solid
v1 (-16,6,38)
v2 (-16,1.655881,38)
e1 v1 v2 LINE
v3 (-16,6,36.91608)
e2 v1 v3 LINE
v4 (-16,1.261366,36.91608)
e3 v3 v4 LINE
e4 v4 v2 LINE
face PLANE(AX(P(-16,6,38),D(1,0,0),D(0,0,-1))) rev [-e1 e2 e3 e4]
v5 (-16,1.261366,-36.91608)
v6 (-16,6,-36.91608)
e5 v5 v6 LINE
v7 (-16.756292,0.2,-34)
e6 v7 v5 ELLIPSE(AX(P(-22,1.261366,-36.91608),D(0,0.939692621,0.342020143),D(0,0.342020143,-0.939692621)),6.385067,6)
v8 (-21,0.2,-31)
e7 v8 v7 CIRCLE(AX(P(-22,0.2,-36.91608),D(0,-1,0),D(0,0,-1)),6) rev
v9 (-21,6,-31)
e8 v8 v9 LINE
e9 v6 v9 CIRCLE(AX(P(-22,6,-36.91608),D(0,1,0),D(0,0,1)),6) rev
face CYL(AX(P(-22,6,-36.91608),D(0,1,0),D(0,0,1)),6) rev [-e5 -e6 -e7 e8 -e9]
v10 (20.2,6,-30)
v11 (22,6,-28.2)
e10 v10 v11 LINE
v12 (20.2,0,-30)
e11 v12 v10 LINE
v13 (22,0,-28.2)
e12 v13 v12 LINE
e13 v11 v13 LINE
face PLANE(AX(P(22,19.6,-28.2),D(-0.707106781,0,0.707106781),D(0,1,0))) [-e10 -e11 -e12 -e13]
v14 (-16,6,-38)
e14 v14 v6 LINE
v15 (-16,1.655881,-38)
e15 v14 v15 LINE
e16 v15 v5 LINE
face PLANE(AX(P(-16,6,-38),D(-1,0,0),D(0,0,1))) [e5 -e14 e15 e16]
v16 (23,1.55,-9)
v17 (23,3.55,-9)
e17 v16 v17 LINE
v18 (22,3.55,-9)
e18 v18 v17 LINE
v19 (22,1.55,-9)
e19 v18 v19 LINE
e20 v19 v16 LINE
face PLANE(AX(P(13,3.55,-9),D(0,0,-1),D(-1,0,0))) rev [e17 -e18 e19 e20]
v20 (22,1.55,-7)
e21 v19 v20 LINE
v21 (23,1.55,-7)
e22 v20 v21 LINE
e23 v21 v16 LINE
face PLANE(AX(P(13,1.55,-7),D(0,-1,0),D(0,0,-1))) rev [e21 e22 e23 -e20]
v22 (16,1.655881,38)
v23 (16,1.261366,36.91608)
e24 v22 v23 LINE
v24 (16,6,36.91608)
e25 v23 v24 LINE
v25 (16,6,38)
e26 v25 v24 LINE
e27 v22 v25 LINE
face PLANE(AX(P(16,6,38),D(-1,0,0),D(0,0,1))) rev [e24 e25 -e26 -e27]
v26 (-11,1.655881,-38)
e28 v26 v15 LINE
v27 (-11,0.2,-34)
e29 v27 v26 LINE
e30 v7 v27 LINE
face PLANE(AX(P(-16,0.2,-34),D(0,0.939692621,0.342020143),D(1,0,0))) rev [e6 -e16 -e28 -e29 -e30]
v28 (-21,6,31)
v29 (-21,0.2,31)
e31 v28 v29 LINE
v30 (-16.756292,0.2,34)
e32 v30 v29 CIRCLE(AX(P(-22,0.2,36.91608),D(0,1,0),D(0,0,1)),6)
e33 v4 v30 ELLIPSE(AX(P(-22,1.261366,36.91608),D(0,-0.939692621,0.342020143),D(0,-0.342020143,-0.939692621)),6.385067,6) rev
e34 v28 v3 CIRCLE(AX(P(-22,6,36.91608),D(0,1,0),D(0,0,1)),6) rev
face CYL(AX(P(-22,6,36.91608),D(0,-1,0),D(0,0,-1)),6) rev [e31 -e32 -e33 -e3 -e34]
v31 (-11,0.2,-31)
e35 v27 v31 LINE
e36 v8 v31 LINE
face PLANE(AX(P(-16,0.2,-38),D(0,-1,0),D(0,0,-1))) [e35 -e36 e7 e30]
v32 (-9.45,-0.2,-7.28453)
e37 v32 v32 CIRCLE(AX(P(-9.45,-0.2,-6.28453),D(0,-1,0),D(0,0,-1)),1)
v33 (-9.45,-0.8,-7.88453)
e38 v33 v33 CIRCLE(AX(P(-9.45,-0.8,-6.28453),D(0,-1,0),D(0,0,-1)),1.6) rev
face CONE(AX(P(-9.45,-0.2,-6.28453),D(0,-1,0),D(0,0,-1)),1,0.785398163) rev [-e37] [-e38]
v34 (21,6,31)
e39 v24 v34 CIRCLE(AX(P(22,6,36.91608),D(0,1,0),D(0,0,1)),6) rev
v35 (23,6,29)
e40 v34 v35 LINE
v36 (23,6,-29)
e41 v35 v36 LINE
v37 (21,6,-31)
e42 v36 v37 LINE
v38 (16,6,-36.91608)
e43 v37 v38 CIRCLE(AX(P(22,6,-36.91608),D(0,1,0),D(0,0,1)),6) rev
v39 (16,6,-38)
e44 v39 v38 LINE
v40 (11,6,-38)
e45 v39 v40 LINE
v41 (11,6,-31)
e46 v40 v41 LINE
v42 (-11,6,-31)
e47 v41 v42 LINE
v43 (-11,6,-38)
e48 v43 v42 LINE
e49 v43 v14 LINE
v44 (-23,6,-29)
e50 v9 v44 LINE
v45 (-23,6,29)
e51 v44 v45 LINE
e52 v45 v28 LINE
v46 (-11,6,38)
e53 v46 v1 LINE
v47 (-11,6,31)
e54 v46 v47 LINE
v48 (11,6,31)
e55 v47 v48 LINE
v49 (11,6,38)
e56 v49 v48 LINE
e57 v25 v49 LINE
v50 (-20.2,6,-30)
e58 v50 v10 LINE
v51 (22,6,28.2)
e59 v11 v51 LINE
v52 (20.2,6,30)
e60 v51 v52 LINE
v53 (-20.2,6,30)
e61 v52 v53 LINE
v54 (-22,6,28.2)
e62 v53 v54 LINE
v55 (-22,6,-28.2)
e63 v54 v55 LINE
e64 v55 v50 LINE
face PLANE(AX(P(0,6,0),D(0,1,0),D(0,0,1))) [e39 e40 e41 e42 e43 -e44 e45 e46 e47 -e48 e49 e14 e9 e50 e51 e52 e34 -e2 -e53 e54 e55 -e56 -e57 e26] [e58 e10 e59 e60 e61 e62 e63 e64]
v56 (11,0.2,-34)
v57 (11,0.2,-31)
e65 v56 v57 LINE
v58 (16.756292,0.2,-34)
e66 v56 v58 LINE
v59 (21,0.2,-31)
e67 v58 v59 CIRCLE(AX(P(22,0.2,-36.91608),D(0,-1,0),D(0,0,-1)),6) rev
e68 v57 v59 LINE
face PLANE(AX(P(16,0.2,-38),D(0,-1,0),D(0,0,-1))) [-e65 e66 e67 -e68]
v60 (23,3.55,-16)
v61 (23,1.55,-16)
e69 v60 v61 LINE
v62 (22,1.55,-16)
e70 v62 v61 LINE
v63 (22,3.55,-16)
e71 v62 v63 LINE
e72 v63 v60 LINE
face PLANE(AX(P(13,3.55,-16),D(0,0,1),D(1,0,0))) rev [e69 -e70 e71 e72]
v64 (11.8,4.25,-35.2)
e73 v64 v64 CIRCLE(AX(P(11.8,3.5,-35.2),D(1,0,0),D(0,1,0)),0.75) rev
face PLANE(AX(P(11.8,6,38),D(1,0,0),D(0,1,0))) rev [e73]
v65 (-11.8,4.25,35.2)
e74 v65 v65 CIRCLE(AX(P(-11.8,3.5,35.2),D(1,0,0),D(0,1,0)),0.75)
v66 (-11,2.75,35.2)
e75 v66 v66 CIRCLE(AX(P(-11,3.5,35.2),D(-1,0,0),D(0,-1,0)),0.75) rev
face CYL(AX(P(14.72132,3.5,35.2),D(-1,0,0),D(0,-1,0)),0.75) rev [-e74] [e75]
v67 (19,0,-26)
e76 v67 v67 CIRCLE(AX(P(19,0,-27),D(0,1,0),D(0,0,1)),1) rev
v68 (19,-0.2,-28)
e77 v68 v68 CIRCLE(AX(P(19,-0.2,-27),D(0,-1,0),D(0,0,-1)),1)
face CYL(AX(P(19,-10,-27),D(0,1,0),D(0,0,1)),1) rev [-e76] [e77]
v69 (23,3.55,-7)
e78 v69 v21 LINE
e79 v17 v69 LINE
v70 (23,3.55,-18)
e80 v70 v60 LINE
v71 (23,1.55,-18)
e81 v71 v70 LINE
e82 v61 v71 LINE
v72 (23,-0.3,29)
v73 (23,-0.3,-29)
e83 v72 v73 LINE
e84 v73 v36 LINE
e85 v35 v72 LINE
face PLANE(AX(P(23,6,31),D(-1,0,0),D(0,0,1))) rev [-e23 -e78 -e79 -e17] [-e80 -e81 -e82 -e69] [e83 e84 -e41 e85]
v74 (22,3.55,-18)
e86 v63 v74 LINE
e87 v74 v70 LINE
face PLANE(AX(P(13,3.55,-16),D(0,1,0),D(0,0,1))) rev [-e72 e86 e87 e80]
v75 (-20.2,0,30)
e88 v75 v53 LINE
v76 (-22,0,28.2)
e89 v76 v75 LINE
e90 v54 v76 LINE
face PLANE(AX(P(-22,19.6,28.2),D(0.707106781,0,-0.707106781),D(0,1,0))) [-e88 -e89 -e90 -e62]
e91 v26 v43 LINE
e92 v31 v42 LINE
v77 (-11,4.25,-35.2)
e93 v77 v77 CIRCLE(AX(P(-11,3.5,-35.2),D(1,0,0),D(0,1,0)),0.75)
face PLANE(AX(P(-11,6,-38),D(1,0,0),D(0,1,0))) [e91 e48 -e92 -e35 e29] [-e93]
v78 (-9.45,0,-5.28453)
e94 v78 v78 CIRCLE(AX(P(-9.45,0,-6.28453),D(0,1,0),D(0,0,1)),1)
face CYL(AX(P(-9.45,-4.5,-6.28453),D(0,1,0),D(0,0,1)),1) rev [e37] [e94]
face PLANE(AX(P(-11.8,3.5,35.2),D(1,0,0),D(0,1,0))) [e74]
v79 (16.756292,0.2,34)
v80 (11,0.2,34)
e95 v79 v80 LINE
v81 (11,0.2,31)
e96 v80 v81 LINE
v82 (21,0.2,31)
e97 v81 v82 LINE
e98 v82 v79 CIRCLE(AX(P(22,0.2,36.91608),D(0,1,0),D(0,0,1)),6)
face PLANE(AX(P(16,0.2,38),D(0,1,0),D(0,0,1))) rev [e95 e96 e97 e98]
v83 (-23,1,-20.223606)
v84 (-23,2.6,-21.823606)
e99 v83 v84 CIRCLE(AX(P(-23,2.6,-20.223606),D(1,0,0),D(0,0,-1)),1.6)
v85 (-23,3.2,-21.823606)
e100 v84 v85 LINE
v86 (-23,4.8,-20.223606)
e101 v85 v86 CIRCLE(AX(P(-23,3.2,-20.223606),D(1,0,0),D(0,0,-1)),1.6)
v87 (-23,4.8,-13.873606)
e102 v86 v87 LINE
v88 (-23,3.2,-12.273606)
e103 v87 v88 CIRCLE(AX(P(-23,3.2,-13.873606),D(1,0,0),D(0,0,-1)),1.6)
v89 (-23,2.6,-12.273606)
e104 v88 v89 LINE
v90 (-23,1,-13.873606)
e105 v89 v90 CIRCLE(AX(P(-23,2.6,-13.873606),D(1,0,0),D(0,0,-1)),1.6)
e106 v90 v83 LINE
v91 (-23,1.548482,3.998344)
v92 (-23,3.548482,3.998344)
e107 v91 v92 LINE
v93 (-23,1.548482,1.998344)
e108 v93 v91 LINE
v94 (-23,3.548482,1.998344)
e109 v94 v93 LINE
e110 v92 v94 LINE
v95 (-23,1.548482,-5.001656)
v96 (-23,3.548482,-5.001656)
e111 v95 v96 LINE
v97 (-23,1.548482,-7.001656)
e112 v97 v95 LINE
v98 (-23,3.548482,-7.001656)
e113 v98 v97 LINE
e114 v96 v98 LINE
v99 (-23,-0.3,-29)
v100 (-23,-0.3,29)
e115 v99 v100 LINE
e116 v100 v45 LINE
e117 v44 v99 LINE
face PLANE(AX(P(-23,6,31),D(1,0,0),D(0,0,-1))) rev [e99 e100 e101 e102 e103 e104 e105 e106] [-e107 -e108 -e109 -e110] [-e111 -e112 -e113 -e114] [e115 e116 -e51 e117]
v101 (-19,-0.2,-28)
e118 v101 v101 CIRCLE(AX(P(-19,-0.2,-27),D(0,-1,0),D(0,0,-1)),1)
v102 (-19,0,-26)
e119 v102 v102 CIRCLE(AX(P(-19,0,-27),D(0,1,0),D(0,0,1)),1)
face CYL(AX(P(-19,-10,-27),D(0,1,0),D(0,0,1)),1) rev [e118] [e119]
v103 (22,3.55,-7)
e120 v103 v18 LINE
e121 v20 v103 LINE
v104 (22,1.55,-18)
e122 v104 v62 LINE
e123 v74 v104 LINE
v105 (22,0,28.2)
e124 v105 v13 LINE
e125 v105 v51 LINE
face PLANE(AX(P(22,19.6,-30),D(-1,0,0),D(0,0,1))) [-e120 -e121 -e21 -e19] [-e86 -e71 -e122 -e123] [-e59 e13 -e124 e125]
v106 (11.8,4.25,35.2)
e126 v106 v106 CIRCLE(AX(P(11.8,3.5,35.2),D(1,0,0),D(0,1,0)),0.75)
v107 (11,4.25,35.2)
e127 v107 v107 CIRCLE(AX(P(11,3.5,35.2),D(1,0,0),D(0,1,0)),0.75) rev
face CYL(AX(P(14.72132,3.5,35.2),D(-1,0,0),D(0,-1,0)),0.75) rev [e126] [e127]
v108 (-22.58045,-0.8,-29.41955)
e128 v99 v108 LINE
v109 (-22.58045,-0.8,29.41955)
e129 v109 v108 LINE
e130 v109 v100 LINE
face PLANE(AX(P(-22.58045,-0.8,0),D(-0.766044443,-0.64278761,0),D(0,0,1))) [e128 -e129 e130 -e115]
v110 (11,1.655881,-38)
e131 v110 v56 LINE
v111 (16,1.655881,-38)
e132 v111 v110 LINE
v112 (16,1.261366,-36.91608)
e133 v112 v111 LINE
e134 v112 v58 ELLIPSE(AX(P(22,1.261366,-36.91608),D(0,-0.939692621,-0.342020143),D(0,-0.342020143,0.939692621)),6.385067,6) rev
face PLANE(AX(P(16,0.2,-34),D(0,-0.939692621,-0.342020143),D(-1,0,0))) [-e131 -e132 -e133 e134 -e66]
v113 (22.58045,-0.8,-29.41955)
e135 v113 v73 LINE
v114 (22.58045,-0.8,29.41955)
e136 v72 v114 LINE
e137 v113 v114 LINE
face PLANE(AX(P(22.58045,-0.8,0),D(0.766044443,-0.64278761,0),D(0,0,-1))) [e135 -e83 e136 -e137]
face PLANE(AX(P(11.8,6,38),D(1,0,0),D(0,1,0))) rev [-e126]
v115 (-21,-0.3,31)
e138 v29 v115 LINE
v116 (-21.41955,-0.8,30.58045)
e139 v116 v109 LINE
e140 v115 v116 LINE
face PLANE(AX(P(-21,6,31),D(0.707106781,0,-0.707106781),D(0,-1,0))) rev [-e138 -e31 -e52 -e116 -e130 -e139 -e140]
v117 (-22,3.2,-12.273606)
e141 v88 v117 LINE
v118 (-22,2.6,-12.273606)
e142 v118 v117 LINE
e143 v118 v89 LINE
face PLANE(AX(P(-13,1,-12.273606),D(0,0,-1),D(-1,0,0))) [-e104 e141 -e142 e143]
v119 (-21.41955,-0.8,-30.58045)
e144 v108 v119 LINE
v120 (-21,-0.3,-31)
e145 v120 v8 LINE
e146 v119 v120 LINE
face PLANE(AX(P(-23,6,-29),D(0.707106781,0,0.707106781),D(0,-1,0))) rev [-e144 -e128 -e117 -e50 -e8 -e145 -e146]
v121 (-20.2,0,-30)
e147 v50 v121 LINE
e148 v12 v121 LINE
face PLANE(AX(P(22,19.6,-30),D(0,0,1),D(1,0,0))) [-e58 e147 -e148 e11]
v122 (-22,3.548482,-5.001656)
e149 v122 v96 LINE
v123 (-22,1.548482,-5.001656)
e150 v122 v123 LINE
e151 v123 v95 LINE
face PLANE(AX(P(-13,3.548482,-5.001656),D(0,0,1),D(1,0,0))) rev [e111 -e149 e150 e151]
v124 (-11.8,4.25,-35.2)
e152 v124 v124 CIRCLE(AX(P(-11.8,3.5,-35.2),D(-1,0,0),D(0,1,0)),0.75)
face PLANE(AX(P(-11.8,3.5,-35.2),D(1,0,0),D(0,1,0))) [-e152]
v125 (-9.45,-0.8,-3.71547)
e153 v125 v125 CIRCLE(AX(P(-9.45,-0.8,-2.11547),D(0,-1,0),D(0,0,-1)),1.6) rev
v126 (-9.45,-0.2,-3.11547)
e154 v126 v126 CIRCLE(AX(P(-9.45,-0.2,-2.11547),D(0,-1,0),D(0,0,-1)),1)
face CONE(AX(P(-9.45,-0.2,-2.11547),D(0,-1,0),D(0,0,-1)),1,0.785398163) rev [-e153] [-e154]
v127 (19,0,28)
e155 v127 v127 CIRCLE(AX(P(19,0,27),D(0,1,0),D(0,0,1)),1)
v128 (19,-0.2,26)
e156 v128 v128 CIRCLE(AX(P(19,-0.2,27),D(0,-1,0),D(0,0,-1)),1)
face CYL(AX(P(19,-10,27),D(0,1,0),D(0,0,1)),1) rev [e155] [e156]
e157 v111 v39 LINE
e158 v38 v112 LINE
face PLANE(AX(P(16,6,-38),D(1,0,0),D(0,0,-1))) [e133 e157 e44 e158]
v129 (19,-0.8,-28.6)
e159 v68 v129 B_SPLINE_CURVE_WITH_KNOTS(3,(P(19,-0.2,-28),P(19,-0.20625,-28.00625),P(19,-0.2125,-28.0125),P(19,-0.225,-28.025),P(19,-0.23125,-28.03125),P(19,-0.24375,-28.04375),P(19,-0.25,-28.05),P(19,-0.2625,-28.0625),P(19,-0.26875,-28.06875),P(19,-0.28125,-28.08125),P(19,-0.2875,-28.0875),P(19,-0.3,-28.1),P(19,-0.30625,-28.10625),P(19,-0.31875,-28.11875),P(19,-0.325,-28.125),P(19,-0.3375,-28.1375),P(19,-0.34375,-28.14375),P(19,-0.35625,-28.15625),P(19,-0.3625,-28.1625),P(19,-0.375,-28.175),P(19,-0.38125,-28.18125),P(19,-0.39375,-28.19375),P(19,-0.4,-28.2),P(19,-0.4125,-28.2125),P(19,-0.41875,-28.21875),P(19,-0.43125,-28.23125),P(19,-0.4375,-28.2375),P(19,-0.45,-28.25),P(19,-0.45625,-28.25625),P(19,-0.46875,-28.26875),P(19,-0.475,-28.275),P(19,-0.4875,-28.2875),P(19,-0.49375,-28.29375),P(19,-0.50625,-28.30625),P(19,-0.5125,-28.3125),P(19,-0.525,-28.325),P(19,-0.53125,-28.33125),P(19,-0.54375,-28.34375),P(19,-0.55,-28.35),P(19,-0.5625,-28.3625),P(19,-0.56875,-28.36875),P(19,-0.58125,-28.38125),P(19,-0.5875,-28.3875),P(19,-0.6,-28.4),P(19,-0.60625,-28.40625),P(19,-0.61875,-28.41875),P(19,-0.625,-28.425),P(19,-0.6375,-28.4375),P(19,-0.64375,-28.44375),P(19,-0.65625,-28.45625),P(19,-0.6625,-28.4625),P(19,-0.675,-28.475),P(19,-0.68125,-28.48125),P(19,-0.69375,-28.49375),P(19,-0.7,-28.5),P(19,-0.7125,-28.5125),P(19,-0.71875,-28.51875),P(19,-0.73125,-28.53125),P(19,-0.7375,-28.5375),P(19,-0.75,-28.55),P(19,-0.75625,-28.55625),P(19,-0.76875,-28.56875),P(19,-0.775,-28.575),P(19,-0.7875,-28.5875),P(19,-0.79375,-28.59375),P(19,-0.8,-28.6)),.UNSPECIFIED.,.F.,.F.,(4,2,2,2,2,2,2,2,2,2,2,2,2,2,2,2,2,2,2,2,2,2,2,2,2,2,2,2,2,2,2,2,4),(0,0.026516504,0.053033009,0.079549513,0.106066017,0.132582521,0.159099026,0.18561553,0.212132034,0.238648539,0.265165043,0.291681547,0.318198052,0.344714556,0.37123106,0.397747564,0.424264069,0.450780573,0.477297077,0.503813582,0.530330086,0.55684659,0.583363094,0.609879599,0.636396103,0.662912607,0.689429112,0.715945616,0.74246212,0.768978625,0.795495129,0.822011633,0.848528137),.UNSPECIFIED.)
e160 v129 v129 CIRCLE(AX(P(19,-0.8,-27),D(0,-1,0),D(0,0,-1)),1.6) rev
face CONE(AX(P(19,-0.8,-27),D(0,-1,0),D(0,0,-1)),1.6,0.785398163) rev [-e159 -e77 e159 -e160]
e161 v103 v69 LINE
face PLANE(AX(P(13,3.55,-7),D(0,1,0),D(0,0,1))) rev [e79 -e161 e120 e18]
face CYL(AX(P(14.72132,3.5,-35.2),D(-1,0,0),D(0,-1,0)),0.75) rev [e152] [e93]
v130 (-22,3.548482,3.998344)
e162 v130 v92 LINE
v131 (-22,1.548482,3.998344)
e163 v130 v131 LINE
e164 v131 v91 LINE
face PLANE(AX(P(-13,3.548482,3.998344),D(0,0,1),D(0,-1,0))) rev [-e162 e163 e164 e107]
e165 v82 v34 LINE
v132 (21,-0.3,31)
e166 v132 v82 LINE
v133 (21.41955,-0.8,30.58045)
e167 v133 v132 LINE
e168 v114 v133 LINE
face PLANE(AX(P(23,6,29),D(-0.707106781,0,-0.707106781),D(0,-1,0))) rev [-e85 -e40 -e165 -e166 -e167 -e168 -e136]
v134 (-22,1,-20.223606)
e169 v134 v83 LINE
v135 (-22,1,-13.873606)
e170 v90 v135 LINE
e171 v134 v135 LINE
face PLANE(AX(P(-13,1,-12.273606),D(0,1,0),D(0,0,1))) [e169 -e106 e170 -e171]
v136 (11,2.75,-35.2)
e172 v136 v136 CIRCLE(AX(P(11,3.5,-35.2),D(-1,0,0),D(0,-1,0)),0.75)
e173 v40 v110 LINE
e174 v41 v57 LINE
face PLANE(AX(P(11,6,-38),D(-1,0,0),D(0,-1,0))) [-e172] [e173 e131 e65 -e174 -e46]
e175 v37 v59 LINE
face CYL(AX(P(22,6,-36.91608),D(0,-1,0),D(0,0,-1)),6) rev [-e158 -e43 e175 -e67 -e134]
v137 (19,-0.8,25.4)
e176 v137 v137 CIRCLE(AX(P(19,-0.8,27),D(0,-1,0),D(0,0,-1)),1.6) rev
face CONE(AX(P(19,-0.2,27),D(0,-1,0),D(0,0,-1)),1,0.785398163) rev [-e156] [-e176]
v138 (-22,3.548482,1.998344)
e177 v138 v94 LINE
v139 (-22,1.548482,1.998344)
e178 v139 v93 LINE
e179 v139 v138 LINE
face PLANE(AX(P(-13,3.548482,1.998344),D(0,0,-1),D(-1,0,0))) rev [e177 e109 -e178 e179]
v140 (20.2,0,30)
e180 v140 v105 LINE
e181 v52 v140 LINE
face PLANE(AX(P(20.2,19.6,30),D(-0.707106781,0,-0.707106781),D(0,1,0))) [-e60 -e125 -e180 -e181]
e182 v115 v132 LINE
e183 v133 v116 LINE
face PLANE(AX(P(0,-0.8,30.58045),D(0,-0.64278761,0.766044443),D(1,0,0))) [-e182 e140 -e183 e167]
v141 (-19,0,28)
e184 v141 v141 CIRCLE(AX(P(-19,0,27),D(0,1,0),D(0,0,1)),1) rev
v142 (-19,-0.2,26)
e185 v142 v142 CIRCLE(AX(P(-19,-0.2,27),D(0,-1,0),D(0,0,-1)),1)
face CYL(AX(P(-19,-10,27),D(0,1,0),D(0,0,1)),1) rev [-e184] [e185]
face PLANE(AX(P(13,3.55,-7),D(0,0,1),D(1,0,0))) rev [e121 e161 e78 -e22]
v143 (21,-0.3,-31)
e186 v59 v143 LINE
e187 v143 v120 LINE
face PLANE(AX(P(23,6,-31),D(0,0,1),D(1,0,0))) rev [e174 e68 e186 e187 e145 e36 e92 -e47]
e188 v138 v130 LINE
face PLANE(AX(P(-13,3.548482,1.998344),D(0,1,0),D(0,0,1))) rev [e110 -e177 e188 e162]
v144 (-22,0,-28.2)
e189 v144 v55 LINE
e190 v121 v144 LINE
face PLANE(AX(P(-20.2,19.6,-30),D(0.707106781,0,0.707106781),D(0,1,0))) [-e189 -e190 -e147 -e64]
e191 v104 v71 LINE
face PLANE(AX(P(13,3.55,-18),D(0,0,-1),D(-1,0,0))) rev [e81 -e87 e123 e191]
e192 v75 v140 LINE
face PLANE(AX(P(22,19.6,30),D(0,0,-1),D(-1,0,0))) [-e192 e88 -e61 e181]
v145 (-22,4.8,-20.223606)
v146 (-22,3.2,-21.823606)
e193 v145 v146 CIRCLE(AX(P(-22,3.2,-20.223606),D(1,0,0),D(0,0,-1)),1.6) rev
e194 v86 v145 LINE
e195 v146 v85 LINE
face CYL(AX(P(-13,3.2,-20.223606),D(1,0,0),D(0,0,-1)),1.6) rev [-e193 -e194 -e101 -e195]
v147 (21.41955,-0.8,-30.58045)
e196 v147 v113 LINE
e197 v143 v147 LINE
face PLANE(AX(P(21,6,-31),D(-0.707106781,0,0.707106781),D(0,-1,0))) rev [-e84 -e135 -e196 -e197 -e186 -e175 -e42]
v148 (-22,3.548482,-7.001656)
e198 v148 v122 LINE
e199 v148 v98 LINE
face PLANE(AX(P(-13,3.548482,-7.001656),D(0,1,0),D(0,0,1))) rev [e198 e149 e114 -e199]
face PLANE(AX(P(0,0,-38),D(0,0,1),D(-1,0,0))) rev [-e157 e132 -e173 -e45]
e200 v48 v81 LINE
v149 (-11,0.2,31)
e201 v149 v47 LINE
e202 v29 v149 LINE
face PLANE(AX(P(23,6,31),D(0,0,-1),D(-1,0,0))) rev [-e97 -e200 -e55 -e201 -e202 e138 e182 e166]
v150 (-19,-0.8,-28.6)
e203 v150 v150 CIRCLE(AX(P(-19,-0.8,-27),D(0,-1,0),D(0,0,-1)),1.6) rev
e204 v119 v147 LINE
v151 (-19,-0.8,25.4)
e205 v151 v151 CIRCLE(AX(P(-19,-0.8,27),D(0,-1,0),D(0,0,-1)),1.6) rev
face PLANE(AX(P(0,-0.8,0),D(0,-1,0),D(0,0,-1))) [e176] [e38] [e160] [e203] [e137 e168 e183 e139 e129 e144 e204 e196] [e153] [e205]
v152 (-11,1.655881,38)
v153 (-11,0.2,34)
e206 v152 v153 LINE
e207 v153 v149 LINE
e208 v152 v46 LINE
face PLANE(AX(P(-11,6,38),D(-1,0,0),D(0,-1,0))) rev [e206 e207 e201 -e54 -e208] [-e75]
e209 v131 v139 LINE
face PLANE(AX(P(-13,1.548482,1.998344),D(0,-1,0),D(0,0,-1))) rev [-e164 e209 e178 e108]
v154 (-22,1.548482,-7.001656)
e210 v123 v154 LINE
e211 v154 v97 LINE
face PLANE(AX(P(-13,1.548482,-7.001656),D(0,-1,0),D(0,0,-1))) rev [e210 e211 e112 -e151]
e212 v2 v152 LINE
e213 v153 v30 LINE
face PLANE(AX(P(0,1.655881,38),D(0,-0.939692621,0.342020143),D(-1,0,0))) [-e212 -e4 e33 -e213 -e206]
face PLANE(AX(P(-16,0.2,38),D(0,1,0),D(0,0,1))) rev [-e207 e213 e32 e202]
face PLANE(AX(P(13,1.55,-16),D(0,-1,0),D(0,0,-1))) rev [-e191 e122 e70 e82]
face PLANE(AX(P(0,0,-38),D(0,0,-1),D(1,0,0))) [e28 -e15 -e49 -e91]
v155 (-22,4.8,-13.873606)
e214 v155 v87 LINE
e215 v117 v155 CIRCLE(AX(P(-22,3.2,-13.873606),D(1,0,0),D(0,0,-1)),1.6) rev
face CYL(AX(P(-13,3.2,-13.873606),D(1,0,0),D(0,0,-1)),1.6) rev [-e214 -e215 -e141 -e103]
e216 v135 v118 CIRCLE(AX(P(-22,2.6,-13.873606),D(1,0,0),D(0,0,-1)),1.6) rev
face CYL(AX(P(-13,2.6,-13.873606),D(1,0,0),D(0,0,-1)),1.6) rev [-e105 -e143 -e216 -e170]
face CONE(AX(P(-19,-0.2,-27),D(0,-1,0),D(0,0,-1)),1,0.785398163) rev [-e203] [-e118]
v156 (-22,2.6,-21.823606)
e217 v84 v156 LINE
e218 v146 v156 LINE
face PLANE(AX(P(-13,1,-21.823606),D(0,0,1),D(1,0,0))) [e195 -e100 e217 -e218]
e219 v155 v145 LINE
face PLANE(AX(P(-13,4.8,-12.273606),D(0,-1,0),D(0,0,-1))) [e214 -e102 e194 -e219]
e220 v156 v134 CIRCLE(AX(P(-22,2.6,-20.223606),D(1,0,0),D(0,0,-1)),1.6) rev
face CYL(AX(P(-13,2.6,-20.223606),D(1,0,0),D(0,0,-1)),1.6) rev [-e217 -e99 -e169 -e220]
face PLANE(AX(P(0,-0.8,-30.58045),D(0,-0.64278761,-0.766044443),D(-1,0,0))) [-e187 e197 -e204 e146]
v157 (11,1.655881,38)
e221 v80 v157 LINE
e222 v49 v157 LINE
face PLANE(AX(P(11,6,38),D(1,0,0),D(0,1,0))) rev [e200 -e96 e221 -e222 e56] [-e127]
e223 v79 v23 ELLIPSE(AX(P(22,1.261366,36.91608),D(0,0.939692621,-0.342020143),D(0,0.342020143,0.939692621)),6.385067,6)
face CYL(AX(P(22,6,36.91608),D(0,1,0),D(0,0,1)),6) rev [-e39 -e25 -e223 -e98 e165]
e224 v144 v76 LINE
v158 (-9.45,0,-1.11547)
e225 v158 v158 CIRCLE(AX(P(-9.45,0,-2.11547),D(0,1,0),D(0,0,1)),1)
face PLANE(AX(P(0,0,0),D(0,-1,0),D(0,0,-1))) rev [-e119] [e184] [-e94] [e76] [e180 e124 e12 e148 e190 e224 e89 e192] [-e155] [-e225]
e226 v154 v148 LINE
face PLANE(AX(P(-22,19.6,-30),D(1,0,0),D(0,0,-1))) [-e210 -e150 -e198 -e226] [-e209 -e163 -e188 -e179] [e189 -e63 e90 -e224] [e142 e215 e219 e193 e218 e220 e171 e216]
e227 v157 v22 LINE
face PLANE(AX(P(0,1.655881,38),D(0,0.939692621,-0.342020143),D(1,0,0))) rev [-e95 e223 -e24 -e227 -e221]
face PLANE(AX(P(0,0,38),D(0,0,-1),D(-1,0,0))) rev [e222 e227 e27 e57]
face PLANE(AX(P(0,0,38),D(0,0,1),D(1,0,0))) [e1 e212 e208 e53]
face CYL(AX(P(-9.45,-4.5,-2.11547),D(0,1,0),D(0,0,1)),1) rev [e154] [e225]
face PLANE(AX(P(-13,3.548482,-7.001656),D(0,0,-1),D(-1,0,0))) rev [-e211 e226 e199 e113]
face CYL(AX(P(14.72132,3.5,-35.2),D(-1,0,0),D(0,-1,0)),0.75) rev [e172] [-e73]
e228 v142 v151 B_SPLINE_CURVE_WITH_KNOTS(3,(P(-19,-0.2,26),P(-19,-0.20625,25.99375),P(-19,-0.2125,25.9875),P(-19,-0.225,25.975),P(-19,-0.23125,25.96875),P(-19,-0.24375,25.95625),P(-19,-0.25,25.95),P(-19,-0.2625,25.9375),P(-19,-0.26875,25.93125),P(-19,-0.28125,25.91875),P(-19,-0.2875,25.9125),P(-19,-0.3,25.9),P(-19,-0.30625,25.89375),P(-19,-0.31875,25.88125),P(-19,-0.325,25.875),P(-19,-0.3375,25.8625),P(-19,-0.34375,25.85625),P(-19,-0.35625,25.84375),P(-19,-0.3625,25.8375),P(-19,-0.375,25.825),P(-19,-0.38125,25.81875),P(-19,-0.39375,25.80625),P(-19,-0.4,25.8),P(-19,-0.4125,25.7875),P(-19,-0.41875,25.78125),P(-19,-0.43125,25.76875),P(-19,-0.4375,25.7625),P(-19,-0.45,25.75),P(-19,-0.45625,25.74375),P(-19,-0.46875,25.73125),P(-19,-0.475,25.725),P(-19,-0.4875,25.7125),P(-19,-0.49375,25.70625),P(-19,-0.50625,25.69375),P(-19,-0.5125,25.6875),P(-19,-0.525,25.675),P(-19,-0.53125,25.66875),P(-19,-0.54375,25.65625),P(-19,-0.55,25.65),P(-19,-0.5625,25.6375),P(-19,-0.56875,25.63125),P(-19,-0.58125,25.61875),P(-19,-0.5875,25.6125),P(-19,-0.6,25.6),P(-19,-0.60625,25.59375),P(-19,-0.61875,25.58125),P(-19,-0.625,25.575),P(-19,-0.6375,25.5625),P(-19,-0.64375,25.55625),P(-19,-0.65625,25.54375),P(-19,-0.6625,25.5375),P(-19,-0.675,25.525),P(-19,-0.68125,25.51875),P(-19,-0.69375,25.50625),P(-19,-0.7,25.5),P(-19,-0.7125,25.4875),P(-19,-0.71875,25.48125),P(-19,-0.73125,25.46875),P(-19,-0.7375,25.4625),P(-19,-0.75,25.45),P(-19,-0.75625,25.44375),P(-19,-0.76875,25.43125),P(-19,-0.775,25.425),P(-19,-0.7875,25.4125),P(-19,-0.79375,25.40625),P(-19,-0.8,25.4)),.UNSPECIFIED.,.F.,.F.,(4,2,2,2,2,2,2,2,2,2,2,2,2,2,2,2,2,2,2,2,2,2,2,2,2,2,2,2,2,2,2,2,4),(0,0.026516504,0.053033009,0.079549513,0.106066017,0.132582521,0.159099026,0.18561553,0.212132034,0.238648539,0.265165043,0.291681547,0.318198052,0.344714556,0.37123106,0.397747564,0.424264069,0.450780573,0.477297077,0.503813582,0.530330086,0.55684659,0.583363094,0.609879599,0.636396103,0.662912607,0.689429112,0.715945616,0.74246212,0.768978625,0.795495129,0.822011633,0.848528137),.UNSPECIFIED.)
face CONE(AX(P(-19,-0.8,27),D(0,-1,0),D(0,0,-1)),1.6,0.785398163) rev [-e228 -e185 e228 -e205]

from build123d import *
from OCP.BRepFilletAPI import BRepFilletAPI_MakeChamfer

# Parameters (mm, degrees)
SKETCH1_W                   = 46
SKETCH1_H                   = 62
SKETCH1_W_2                 = 44
SKETCH1_H_2                 = 60
BOSS_EXTRUDE1_DEPTH         = 6
SKETCH2_W                   = 46
SKETCH2_H                   = 62
BOSS_EXTRUDE2_DEPTH         = 0.8
SKETCH3_W                   = 44
SKETCH3_H                   = 60
SKETCH3_R                   = 1
BOSS_EXTRUDE3_DEPTH         = 6
SKETCH7_W                   = 44
SKETCH7_H                   = 60
CUT_EXTRUDE3_DEPTH          = 19.6
SKETCH3_5_R                 = 1
CUT_EXTRUDE7_DEPTH          = 10
SKETCH14_R                  = 1
CUT_EXTRUDE12_DEPTH         = 4.5
CHAMFER5_SIZE               = 0.6
CHAMFER7_SIZE               = 0.5
CHAMFER7_SIZE2              = 0.419549816
CHAMFER9_SIZE               = 1.8
CHAMFER10_SIZE              = 2
SKETCH15_W                  = 9.55
SKETCH15_H                  = 3.8
CUT_EXTRUDE13_DEPTH         = 10
FILLET6_R                   = 1.6
SKETCH17_W                  = 2
SKETCH17_H                  = 2
CUT_EXTRUDE14_DEPTH         = 10
SKETCH19_W                  = 5
SKETCH19_H                  = 5.8
BOSS_EXTRUDE6_DEPTH         = 7
CHAMFER11_SIZE              = 4
CHAMFER11_SIZE2             = 1.455880937
CUT_EXTRUDE15_START         = -0.8
SKETCH20_R                  = 0.75
CUT_EXTRUDE15_DEPTH         = 23.6
CHAMFER11_OF_MIRROR17_SIZE  = 4
CHAMFER11_OF_MIRROR17_SIZE2 = 1.455880937
FILLET7_R                   = 6
SKETCH21_W                  = 2
SKETCH21_H                  = 2
CUT_EXTRUDE16_DEPTH         = 10


with BuildPart() as part:
    # Sketch1 → Boss-Extrude1 (new body)
    with BuildSketch(Plane(origin=(0, 0, 0), x_dir=(1, 0, 0), z_dir=(0, 1, 0))):
        Rectangle(SKETCH1_W, SKETCH1_H)
        Rectangle(SKETCH1_W_2, SKETCH1_H_2, mode=Mode.SUBTRACT)
    extrude(amount=BOSS_EXTRUDE1_DEPTH)

    # Sketch2 → Boss-Extrude2 (add)
    with BuildSketch(Plane.XZ):
        Rectangle(SKETCH2_W, SKETCH2_H)
    extrude(amount=BOSS_EXTRUDE2_DEPTH)

    # Sketch3 → Boss-Extrude3 (add)
    # profile 1 of 4: a face of its own
    with BuildSketch(Plane(origin=(0, 0, 0), x_dir=(1, 0, 0), z_dir=(0, 1, 0))):
        Rectangle(SKETCH3_W, SKETCH3_H)
        with Locations(Location((-19, -27, 0), (0, 0, 90))):
            Circle(SKETCH3_R, mode=Mode.SUBTRACT)
        with Locations(Location((19, -27, 0), (0, 0, 270))):
            Circle(SKETCH3_R, mode=Mode.SUBTRACT)
        with Locations(Location((-19, 27, 0), (0, 0, 270))):
            Circle(SKETCH3_R, mode=Mode.SUBTRACT)
        with Locations(Location((19, 27, 0), (0, 0, 90))):
            Circle(SKETCH3_R, mode=Mode.SUBTRACT)
    # profile 2 of 4: a face of its own
    with BuildSketch(Plane(origin=(0, 0, 0), x_dir=(1, 0, 0), z_dir=(0, 1, 0))):
        Rectangle(SKETCH3_W, SKETCH3_H)
        with Locations(Location((-19, -27, 0), (0, 0, 90))):
            Circle(SKETCH3_R, mode=Mode.SUBTRACT)
        with Locations(Location((19, -27, 0), (0, 0, 270))):
            Circle(SKETCH3_R, mode=Mode.SUBTRACT)
        with Locations(Location((-19, 27, 0), (0, 0, 270))):
            Circle(SKETCH3_R, mode=Mode.SUBTRACT)
        with Locations(Location((19, 27, 0), (0, 0, 90))):
            Circle(SKETCH3_R, mode=Mode.SUBTRACT)
    # profile 3 of 4: a face of its own
    with BuildSketch(Plane(origin=(0, 0, 0), x_dir=(1, 0, 0), z_dir=(0, 1, 0))):
        Rectangle(SKETCH3_W, SKETCH3_H)
        with Locations(Location((-19, -27, 0), (0, 0, 90))):
            Circle(SKETCH3_R, mode=Mode.SUBTRACT)
        with Locations(Location((19, -27, 0), (0, 0, 270))):
            Circle(SKETCH3_R, mode=Mode.SUBTRACT)
        with Locations(Location((-19, 27, 0), (0, 0, 270))):
            Circle(SKETCH3_R, mode=Mode.SUBTRACT)
        with Locations(Location((19, 27, 0), (0, 0, 90))):
            Circle(SKETCH3_R, mode=Mode.SUBTRACT)
    # profile 4 of 4: a face of its own
    with BuildSketch(Plane(origin=(0, 0, 0), x_dir=(1, 0, 0), z_dir=(0, 1, 0))):
        Rectangle(SKETCH3_W, SKETCH3_H)
        with Locations(Location((-19, -27, 0), (0, 0, 90))):
            Circle(SKETCH3_R, mode=Mode.SUBTRACT)
        with Locations(Location((19, -27, 0), (0, 0, 270))):
            Circle(SKETCH3_R, mode=Mode.SUBTRACT)
        with Locations(Location((-19, 27, 0), (0, 0, 270))):
            Circle(SKETCH3_R, mode=Mode.SUBTRACT)
        with Locations(Location((19, 27, 0), (0, 0, 90))):
            Circle(SKETCH3_R, mode=Mode.SUBTRACT)
    extrude(amount=BOSS_EXTRUDE3_DEPTH)

    # Sketch7 → Cut-Extrude3 (cut)
    with BuildSketch(Plane(origin=(0, 0, 0), x_dir=(1, 0, 0), z_dir=(0, 1, 0))):
        Rectangle(SKETCH7_W, SKETCH7_H)
    extrude(amount=CUT_EXTRUDE3_DEPTH, mode=Mode.SUBTRACT)

    # Sketch3<5> → Cut-Extrude7 (cut)
    with BuildSketch(Plane(origin=(0, 0, 0), x_dir=(1, 0, 0), z_dir=(0, 1, 0))):
        with Locations(Location((-19, 27, 0), (0, 0, 270))):
            Circle(SKETCH3_5_R)
        with Locations(Location((19, 27, 0), (0, 0, 270))):
            Circle(SKETCH3_5_R)
        with Locations(Location((19, -27, 0), (0, 0, 270))):
            Circle(SKETCH3_5_R)
        with Locations(Location((-19, -27, 0), (0, 0, 270))):
            Circle(SKETCH3_5_R)
    extrude(amount=-CUT_EXTRUDE7_DEPTH, mode=Mode.SUBTRACT)

    # Sketch14 → Cut-Extrude12 (cut)
    with BuildSketch(Plane(origin=(0, 0, 0), x_dir=(1, 0, 0), z_dir=(0, 1, 0))):
        with Locations(Location((-9.45, 6.284530189, 0), (0, 0, 270))):
            Circle(SKETCH14_R)
        with Locations(Location((-9.45, 2.115469811, 0), (0, 0, 270))):
            Circle(SKETCH14_R)
    extrude(amount=-CUT_EXTRUDE12_DEPTH, mode=Mode.SUBTRACT)

    # Chamfer5
    chamfer5_edges = [part.edges().sort_by_distance(p)[0] for p in [
        (-19, -0.8, -28),
        (-9.45, -0.8, -7.284530189),
        (-9.45, -0.8, -3.115469811),
        (-19, -0.8, 26),
        (19, -0.8, 26),
        (19, -0.8, -28),
    ]]
    chamfer(chamfer5_edges, length=CHAMFER5_SIZE)

    # Chamfer7: one chamfer whose edges measure the first distance from different faces: ONE call of the kernel's chamfer builder (chamfer() names one face for all edges)
    chamfer7_edges_1 = [part.edges().sort_by_distance(p)[0] for p in [
        (-23, -0.8, 0),
    ]]
    chamfer7_side_1 = [part.faces().sort_by_distance(p)[0] for p in [
        (-23, 2.6, 0),
    ]]
    chamfer7_edges_2 = [part.edges().sort_by_distance(p)[0] for p in [
        (0, -0.8, -31),
    ]]
    chamfer7_side_2 = [part.faces().sort_by_distance(p)[0] for p in [
        (0, 2.6, -31),
    ]]
    chamfer7_edges_3 = [part.edges().sort_by_distance(p)[0] for p in [
        (23, -0.8, 0),
    ]]
    chamfer7_side_3 = [part.faces().sort_by_distance(p)[0] for p in [
        (23, 2.6, 0),
    ]]
    chamfer7_edges_4 = [part.edges().sort_by_distance(p)[0] for p in [
        (0, -0.8, 31),
    ]]
    chamfer7_side_4 = [part.faces().sort_by_distance(p)[0] for p in [
        (0, 2.6, 31),
    ]]
    chamfer7 = BRepFilletAPI_MakeChamfer(part.part.solid().wrapped)
    for e in chamfer7_edges_1:
        chamfer7.Add(CHAMFER7_SIZE, CHAMFER7_SIZE2, e.wrapped, chamfer7_side_1[0].wrapped)  # the first distance lies on this face
    for e in chamfer7_edges_2:
        chamfer7.Add(CHAMFER7_SIZE, CHAMFER7_SIZE2, e.wrapped, chamfer7_side_2[0].wrapped)  # the first distance lies on this face
    for e in chamfer7_edges_3:
        chamfer7.Add(CHAMFER7_SIZE, CHAMFER7_SIZE2, e.wrapped, chamfer7_side_3[0].wrapped)  # the first distance lies on this face
    for e in chamfer7_edges_4:
        chamfer7.Add(CHAMFER7_SIZE, CHAMFER7_SIZE2, e.wrapped, chamfer7_side_4[0].wrapped)  # the first distance lies on this face
    add(Compound.cast(chamfer7.Shape()), mode=Mode.REPLACE)

    # Chamfer9
    chamfer9_edges = [part.edges().sort_by_distance(p)[0] for p in [
        (-22, 3, -30),
        (-22, 3, 30),
        (22, 3, 30),
        (22, 3, -30),
    ]]
    chamfer(chamfer9_edges, length=CHAMFER9_SIZE)

    # Chamfer10
    # the kernel refuses this chamfer: 2 mm, written as the material it takes off along each edge
    with BuildSketch(Plane(origin=(23, -5.443365976, 31), x_dir=(-0.9996219169112968, 1.5667810843409742e-15, 0.027495876610585647), z_dir=(0, 1, 0)), Plane(origin=(-23, 11.143365976, 31), x_dir=(0.9996219169112968, 0, 0.027495876610585647), z_dir=(0, -1, 0)), Plane(origin=(-23, 11.143365976, -31), x_dir=(-0.027495876610585647, 0, 0.9996219169112968), z_dir=(0, -1, 0)), Plane(origin=(23, -5.443365976, -31), x_dir=(0.027495876610585647, 0, 0.9996219169112968), z_dir=(0, 1, 0))) as chamfer10_piece_1:
        Polygon((CHAMFER10_SIZE * 0.999621916911, -CHAMFER10_SIZE * 0.0274958766106), (-CHAMFER10_SIZE * 0.0274958766106, -CHAMFER10_SIZE * 0.999621916911), (0, 0), align=None)
    extrude(amount=16.586731952, mode=Mode.SUBTRACT)

    # Sketch15 → Cut-Extrude13 (cut)
    with BuildSketch(Plane(origin=(-23, 0, -8), x_dir=(0, 0, -1), z_dir=(1, 0, 0))):
        with Locations((9.048605705, 2.9)):
            Rectangle(SKETCH15_W, SKETCH15_H)
    extrude(amount=CUT_EXTRUDE13_DEPTH, mode=Mode.SUBTRACT)

    # Fillet6
    fillet6_edges = [part.edges().sort_by_distance(p)[0] for p in [
        (-22.5, 4.8, -12.273605705),
        (-22.5, 1, -12.273605705),
        (-22.5, 1, -21.823605705),
        (-22.5, 4.8, -21.823605705),
    ]]
    fillet(fillet6_edges, radius=FILLET6_R)

    # Sketch17 → Cut-Extrude14 (cut)
    with BuildSketch(Plane.ZY.offset(23)):
        with Locations((-6.001655918, 2.54848205)):
            Rectangle(SKETCH17_W, SKETCH17_H)
        with Locations((2.998344082, 2.54848205)):
            Rectangle(SKETCH17_W, SKETCH17_H)
    extrude(amount=-CUT_EXTRUDE14_DEPTH, mode=Mode.SUBTRACT)

    # Sketch19 → Boss-Extrude6 (add)
    with BuildSketch(Plane.XY.offset(31)):
        with Locations((-13.5, 3.1)):
            Rectangle(SKETCH19_W, SKETCH19_H)
        with Locations((13.5, 3.1)):
            Rectangle(SKETCH19_W, SKETCH19_H)
    boss_extrude6 = extrude(amount=BOSS_EXTRUDE6_DEPTH)

    # Chamfer11: one chamfer whose edges measure the first distance from different faces: ONE call of the kernel's chamfer builder (chamfer() names one face for all edges)
    chamfer11_edges_1 = [part.edges().sort_by_distance(p)[0] for p in [
        (-13.5, 0.2, 38),
    ]]
    chamfer11_side_1 = [part.faces().sort_by_distance(p)[0] for p in [
        (-13.5, 0.2, 34.5),
    ]]
    chamfer11_edges_2 = [part.edges().sort_by_distance(p)[0] for p in [
        (13.5, 0.2, 38),
    ]]
    chamfer11_side_2 = [part.faces().sort_by_distance(p)[0] for p in [
        (13.5, 0.2, 34.5),
    ]]
    chamfer11 = BRepFilletAPI_MakeChamfer(part.part.solid().wrapped)
    for e in chamfer11_edges_1:
        chamfer11.Add(CHAMFER11_SIZE, CHAMFER11_SIZE2, e.wrapped, chamfer11_side_1[0].wrapped)  # the first distance lies on this face
    for e in chamfer11_edges_2:
        chamfer11.Add(CHAMFER11_SIZE, CHAMFER11_SIZE2, e.wrapped, chamfer11_side_2[0].wrapped)  # the first distance lies on this face
    add(Compound.cast(chamfer11.Shape()), mode=Mode.REPLACE)

    # Sketch20 → Cut-Extrude15 (cut)
    with BuildSketch(Plane(origin=(-11, 0, 0), x_dir=(0, 0, -1), z_dir=(1, 0, 0)).offset(CUT_EXTRUDE15_START)):
        with Locations(Location((-35.2, 3.5, 0), (0, 0, 90))):
            Circle(SKETCH20_R)
    cut_extrude15 = extrude(amount=CUT_EXTRUDE15_DEPTH, mode=Mode.SUBTRACT)

    # Mirror17: Boss-Extrude6, Cut-Extrude15 across plane
    add(boss_extrude6.mirror(Plane.XY))
    add(cut_extrude15.mirror(Plane.XY), mode=Mode.SUBTRACT)

    # Chamfer11 of Mirror17: one chamfer whose edges measure the first distance from different faces: ONE call of the kernel's chamfer builder (chamfer() names one face for all edges)
    chamfer11_of_mirror17_edges_1 = [part.edges().sort_by_distance(p)[0] for p in [
        (-13.5, 0.2, -38),
    ]]
    chamfer11_of_mirror17_side_1 = [part.faces().sort_by_distance(p)[0] for p in [
        (-13.5, 0.2, -34.5),
    ]]
    chamfer11_of_mirror17_edges_2 = [part.edges().sort_by_distance(p)[0] for p in [
        (13.5, 0.2, -38),
    ]]
    chamfer11_of_mirror17_side_2 = [part.faces().sort_by_distance(p)[0] for p in [
        (13.5, 0.2, -34.5),
    ]]
    chamfer11_of_mirror17 = BRepFilletAPI_MakeChamfer(part.part.solid().wrapped)
    for e in chamfer11_of_mirror17_edges_1:
        chamfer11_of_mirror17.Add(CHAMFER11_OF_MIRROR17_SIZE, CHAMFER11_OF_MIRROR17_SIZE2, e.wrapped, chamfer11_of_mirror17_side_1[0].wrapped)  # the first distance lies on this face
    for e in chamfer11_of_mirror17_edges_2:
        chamfer11_of_mirror17.Add(CHAMFER11_OF_MIRROR17_SIZE, CHAMFER11_OF_MIRROR17_SIZE2, e.wrapped, chamfer11_of_mirror17_side_2[0].wrapped)  # the first distance lies on this face
    add(Compound.cast(chamfer11_of_mirror17.Shape()), mode=Mode.REPLACE)

    # Fillet7
    # the kernel refuses this fillet: 6 mm, written as the material it adds along each edge
    with BuildSketch(Plane(origin=(16, 0.2, 31), x_dir=(1, 0, 0), z_dir=(0, 1, 0))) as fillet7_piece_1_section:
        with BuildLine():
            CenterArc((6, -5.916079783), FILLET7_R, 99.594068227, 80.405931773)
            Line((0, -5.916079783), (-0.12, -5.916079783))
            Line((-0.12, -5.916079783), (-0.12, 0))
            Line((-0.12, 0), (0, 0.12))
            ThreePointArc((0, 0.12), (2.5, 0.12), (4.98, 0.118321596))
            Line((4.98, 0.118321596), (5, 0))
        make_face()
    fillet7_piece_1 = extrude(amount=5.8, mode=Mode.PRIVATE)
    fillet7_piece_1 = split(fillet7_piece_1, bisect_by=Plane(origin=(16.527662271, 0.235819169, 34.098412357), z_dir=(0, 0.9396926207859081, -0.34202014332566943)), keep=Keep.TOP, mode=Mode.PRIVATE)
    add(fillet7_piece_1)
    with BuildSketch(Plane(origin=(-16, 0.2, 31), x_dir=(-1, 0, 0), z_dir=(0, 1, 0))) as fillet7_piece_2_section:
        with BuildLine():
            CenterArc((6, 5.916079783), FILLET7_R, 180, 80.405931773)
            Line((0, 5.916079783), (-0.12, 5.916079783))
            Line((-0.12, 5.916079783), (-0.12, 0))
            Line((-0.12, 0), (0, -0.12))
            ThreePointArc((0, -0.12), (2.5, -0.12), (4.98, -0.118321596))
            Line((4.98, -0.118321596), (5, 0))
        make_face()
    fillet7_piece_2 = extrude(amount=5.8, mode=Mode.PRIVATE)
    fillet7_piece_2 = split(fillet7_piece_2, bisect_by=Plane(origin=(-16.527662271, 0.235819169, 34.098412357), z_dir=(0, 0.9396926207859081, -0.34202014332566943)), keep=Keep.TOP, mode=Mode.PRIVATE)
    add(fillet7_piece_2)
    with BuildSketch(Plane(origin=(-16, 0.2, -31), x_dir=(0, 0, -1), z_dir=(0, 1, 0))) as fillet7_piece_3_section:
        with BuildLine():
            CenterArc((5.916079783, 6), FILLET7_R, 189.594068227, 80.405931773)
            Line((0, 5), (-0.118321596, 4.98))
            ThreePointArc((-0.118321596, 4.98), (-0.12, 2.5), (-0.12, 0))
            Line((-0.12, 0), (0, -0.12))
            Line((0, -0.12), (5.916079783, -0.12))
            Line((5.916079783, -0.12), (5.916079783, 0))
        make_face()
    fillet7_piece_3 = extrude(amount=5.8, mode=Mode.PRIVATE)
    fillet7_piece_3 = split(fillet7_piece_3, bisect_by=Plane(origin=(-15.957282579, 1.368762804, -37.211149414), z_dir=(0, 0.9396926207859081, 0.34202014332566943)), keep=Keep.TOP, mode=Mode.PRIVATE)
    add(fillet7_piece_3)
    with BuildSketch(Plane(origin=(16, 0.2, -31), x_dir=(1, 0, 0), z_dir=(0, 1, 0))) as fillet7_piece_4_section:
        with BuildLine():
            CenterArc((6, 5.916079783), FILLET7_R, 180, 80.405931773)
            Line((0, 5.916079783), (-0.12, 5.916079783))
            Line((-0.12, 5.916079783), (-0.12, 0))
            Line((-0.12, 0), (0, -0.12))
            ThreePointArc((0, -0.12), (2.5, -0.12), (4.98, -0.118321596))
            Line((4.98, -0.118321596), (5, 0))
        make_face()
    fillet7_piece_4 = extrude(amount=5.8, mode=Mode.PRIVATE)
    fillet7_piece_4 = split(fillet7_piece_4, bisect_by=Plane(origin=(16.527662271, 0.235819169, -34.098412357), z_dir=(0, 0.9396926207859081, 0.34202014332566943)), keep=Keep.TOP, mode=Mode.PRIVATE)
    add(fillet7_piece_4)

    # Sketch21 → Cut-Extrude16 (cut)
    with BuildSketch(Plane(origin=(23, 0, 0), x_dir=(0, 0, -1), z_dir=(1, 0, 0))):
        with Locations((17, 2.55)):
            Rectangle(SKETCH21_W, SKETCH21_H)
        with Locations((8, 2.55)):
            Rectangle(SKETCH21_W, SKETCH21_H)
    extrude(amount=-CUT_EXTRUDE16_DEPTH, mode=Mode.SUBTRACT)


solid = part.part
